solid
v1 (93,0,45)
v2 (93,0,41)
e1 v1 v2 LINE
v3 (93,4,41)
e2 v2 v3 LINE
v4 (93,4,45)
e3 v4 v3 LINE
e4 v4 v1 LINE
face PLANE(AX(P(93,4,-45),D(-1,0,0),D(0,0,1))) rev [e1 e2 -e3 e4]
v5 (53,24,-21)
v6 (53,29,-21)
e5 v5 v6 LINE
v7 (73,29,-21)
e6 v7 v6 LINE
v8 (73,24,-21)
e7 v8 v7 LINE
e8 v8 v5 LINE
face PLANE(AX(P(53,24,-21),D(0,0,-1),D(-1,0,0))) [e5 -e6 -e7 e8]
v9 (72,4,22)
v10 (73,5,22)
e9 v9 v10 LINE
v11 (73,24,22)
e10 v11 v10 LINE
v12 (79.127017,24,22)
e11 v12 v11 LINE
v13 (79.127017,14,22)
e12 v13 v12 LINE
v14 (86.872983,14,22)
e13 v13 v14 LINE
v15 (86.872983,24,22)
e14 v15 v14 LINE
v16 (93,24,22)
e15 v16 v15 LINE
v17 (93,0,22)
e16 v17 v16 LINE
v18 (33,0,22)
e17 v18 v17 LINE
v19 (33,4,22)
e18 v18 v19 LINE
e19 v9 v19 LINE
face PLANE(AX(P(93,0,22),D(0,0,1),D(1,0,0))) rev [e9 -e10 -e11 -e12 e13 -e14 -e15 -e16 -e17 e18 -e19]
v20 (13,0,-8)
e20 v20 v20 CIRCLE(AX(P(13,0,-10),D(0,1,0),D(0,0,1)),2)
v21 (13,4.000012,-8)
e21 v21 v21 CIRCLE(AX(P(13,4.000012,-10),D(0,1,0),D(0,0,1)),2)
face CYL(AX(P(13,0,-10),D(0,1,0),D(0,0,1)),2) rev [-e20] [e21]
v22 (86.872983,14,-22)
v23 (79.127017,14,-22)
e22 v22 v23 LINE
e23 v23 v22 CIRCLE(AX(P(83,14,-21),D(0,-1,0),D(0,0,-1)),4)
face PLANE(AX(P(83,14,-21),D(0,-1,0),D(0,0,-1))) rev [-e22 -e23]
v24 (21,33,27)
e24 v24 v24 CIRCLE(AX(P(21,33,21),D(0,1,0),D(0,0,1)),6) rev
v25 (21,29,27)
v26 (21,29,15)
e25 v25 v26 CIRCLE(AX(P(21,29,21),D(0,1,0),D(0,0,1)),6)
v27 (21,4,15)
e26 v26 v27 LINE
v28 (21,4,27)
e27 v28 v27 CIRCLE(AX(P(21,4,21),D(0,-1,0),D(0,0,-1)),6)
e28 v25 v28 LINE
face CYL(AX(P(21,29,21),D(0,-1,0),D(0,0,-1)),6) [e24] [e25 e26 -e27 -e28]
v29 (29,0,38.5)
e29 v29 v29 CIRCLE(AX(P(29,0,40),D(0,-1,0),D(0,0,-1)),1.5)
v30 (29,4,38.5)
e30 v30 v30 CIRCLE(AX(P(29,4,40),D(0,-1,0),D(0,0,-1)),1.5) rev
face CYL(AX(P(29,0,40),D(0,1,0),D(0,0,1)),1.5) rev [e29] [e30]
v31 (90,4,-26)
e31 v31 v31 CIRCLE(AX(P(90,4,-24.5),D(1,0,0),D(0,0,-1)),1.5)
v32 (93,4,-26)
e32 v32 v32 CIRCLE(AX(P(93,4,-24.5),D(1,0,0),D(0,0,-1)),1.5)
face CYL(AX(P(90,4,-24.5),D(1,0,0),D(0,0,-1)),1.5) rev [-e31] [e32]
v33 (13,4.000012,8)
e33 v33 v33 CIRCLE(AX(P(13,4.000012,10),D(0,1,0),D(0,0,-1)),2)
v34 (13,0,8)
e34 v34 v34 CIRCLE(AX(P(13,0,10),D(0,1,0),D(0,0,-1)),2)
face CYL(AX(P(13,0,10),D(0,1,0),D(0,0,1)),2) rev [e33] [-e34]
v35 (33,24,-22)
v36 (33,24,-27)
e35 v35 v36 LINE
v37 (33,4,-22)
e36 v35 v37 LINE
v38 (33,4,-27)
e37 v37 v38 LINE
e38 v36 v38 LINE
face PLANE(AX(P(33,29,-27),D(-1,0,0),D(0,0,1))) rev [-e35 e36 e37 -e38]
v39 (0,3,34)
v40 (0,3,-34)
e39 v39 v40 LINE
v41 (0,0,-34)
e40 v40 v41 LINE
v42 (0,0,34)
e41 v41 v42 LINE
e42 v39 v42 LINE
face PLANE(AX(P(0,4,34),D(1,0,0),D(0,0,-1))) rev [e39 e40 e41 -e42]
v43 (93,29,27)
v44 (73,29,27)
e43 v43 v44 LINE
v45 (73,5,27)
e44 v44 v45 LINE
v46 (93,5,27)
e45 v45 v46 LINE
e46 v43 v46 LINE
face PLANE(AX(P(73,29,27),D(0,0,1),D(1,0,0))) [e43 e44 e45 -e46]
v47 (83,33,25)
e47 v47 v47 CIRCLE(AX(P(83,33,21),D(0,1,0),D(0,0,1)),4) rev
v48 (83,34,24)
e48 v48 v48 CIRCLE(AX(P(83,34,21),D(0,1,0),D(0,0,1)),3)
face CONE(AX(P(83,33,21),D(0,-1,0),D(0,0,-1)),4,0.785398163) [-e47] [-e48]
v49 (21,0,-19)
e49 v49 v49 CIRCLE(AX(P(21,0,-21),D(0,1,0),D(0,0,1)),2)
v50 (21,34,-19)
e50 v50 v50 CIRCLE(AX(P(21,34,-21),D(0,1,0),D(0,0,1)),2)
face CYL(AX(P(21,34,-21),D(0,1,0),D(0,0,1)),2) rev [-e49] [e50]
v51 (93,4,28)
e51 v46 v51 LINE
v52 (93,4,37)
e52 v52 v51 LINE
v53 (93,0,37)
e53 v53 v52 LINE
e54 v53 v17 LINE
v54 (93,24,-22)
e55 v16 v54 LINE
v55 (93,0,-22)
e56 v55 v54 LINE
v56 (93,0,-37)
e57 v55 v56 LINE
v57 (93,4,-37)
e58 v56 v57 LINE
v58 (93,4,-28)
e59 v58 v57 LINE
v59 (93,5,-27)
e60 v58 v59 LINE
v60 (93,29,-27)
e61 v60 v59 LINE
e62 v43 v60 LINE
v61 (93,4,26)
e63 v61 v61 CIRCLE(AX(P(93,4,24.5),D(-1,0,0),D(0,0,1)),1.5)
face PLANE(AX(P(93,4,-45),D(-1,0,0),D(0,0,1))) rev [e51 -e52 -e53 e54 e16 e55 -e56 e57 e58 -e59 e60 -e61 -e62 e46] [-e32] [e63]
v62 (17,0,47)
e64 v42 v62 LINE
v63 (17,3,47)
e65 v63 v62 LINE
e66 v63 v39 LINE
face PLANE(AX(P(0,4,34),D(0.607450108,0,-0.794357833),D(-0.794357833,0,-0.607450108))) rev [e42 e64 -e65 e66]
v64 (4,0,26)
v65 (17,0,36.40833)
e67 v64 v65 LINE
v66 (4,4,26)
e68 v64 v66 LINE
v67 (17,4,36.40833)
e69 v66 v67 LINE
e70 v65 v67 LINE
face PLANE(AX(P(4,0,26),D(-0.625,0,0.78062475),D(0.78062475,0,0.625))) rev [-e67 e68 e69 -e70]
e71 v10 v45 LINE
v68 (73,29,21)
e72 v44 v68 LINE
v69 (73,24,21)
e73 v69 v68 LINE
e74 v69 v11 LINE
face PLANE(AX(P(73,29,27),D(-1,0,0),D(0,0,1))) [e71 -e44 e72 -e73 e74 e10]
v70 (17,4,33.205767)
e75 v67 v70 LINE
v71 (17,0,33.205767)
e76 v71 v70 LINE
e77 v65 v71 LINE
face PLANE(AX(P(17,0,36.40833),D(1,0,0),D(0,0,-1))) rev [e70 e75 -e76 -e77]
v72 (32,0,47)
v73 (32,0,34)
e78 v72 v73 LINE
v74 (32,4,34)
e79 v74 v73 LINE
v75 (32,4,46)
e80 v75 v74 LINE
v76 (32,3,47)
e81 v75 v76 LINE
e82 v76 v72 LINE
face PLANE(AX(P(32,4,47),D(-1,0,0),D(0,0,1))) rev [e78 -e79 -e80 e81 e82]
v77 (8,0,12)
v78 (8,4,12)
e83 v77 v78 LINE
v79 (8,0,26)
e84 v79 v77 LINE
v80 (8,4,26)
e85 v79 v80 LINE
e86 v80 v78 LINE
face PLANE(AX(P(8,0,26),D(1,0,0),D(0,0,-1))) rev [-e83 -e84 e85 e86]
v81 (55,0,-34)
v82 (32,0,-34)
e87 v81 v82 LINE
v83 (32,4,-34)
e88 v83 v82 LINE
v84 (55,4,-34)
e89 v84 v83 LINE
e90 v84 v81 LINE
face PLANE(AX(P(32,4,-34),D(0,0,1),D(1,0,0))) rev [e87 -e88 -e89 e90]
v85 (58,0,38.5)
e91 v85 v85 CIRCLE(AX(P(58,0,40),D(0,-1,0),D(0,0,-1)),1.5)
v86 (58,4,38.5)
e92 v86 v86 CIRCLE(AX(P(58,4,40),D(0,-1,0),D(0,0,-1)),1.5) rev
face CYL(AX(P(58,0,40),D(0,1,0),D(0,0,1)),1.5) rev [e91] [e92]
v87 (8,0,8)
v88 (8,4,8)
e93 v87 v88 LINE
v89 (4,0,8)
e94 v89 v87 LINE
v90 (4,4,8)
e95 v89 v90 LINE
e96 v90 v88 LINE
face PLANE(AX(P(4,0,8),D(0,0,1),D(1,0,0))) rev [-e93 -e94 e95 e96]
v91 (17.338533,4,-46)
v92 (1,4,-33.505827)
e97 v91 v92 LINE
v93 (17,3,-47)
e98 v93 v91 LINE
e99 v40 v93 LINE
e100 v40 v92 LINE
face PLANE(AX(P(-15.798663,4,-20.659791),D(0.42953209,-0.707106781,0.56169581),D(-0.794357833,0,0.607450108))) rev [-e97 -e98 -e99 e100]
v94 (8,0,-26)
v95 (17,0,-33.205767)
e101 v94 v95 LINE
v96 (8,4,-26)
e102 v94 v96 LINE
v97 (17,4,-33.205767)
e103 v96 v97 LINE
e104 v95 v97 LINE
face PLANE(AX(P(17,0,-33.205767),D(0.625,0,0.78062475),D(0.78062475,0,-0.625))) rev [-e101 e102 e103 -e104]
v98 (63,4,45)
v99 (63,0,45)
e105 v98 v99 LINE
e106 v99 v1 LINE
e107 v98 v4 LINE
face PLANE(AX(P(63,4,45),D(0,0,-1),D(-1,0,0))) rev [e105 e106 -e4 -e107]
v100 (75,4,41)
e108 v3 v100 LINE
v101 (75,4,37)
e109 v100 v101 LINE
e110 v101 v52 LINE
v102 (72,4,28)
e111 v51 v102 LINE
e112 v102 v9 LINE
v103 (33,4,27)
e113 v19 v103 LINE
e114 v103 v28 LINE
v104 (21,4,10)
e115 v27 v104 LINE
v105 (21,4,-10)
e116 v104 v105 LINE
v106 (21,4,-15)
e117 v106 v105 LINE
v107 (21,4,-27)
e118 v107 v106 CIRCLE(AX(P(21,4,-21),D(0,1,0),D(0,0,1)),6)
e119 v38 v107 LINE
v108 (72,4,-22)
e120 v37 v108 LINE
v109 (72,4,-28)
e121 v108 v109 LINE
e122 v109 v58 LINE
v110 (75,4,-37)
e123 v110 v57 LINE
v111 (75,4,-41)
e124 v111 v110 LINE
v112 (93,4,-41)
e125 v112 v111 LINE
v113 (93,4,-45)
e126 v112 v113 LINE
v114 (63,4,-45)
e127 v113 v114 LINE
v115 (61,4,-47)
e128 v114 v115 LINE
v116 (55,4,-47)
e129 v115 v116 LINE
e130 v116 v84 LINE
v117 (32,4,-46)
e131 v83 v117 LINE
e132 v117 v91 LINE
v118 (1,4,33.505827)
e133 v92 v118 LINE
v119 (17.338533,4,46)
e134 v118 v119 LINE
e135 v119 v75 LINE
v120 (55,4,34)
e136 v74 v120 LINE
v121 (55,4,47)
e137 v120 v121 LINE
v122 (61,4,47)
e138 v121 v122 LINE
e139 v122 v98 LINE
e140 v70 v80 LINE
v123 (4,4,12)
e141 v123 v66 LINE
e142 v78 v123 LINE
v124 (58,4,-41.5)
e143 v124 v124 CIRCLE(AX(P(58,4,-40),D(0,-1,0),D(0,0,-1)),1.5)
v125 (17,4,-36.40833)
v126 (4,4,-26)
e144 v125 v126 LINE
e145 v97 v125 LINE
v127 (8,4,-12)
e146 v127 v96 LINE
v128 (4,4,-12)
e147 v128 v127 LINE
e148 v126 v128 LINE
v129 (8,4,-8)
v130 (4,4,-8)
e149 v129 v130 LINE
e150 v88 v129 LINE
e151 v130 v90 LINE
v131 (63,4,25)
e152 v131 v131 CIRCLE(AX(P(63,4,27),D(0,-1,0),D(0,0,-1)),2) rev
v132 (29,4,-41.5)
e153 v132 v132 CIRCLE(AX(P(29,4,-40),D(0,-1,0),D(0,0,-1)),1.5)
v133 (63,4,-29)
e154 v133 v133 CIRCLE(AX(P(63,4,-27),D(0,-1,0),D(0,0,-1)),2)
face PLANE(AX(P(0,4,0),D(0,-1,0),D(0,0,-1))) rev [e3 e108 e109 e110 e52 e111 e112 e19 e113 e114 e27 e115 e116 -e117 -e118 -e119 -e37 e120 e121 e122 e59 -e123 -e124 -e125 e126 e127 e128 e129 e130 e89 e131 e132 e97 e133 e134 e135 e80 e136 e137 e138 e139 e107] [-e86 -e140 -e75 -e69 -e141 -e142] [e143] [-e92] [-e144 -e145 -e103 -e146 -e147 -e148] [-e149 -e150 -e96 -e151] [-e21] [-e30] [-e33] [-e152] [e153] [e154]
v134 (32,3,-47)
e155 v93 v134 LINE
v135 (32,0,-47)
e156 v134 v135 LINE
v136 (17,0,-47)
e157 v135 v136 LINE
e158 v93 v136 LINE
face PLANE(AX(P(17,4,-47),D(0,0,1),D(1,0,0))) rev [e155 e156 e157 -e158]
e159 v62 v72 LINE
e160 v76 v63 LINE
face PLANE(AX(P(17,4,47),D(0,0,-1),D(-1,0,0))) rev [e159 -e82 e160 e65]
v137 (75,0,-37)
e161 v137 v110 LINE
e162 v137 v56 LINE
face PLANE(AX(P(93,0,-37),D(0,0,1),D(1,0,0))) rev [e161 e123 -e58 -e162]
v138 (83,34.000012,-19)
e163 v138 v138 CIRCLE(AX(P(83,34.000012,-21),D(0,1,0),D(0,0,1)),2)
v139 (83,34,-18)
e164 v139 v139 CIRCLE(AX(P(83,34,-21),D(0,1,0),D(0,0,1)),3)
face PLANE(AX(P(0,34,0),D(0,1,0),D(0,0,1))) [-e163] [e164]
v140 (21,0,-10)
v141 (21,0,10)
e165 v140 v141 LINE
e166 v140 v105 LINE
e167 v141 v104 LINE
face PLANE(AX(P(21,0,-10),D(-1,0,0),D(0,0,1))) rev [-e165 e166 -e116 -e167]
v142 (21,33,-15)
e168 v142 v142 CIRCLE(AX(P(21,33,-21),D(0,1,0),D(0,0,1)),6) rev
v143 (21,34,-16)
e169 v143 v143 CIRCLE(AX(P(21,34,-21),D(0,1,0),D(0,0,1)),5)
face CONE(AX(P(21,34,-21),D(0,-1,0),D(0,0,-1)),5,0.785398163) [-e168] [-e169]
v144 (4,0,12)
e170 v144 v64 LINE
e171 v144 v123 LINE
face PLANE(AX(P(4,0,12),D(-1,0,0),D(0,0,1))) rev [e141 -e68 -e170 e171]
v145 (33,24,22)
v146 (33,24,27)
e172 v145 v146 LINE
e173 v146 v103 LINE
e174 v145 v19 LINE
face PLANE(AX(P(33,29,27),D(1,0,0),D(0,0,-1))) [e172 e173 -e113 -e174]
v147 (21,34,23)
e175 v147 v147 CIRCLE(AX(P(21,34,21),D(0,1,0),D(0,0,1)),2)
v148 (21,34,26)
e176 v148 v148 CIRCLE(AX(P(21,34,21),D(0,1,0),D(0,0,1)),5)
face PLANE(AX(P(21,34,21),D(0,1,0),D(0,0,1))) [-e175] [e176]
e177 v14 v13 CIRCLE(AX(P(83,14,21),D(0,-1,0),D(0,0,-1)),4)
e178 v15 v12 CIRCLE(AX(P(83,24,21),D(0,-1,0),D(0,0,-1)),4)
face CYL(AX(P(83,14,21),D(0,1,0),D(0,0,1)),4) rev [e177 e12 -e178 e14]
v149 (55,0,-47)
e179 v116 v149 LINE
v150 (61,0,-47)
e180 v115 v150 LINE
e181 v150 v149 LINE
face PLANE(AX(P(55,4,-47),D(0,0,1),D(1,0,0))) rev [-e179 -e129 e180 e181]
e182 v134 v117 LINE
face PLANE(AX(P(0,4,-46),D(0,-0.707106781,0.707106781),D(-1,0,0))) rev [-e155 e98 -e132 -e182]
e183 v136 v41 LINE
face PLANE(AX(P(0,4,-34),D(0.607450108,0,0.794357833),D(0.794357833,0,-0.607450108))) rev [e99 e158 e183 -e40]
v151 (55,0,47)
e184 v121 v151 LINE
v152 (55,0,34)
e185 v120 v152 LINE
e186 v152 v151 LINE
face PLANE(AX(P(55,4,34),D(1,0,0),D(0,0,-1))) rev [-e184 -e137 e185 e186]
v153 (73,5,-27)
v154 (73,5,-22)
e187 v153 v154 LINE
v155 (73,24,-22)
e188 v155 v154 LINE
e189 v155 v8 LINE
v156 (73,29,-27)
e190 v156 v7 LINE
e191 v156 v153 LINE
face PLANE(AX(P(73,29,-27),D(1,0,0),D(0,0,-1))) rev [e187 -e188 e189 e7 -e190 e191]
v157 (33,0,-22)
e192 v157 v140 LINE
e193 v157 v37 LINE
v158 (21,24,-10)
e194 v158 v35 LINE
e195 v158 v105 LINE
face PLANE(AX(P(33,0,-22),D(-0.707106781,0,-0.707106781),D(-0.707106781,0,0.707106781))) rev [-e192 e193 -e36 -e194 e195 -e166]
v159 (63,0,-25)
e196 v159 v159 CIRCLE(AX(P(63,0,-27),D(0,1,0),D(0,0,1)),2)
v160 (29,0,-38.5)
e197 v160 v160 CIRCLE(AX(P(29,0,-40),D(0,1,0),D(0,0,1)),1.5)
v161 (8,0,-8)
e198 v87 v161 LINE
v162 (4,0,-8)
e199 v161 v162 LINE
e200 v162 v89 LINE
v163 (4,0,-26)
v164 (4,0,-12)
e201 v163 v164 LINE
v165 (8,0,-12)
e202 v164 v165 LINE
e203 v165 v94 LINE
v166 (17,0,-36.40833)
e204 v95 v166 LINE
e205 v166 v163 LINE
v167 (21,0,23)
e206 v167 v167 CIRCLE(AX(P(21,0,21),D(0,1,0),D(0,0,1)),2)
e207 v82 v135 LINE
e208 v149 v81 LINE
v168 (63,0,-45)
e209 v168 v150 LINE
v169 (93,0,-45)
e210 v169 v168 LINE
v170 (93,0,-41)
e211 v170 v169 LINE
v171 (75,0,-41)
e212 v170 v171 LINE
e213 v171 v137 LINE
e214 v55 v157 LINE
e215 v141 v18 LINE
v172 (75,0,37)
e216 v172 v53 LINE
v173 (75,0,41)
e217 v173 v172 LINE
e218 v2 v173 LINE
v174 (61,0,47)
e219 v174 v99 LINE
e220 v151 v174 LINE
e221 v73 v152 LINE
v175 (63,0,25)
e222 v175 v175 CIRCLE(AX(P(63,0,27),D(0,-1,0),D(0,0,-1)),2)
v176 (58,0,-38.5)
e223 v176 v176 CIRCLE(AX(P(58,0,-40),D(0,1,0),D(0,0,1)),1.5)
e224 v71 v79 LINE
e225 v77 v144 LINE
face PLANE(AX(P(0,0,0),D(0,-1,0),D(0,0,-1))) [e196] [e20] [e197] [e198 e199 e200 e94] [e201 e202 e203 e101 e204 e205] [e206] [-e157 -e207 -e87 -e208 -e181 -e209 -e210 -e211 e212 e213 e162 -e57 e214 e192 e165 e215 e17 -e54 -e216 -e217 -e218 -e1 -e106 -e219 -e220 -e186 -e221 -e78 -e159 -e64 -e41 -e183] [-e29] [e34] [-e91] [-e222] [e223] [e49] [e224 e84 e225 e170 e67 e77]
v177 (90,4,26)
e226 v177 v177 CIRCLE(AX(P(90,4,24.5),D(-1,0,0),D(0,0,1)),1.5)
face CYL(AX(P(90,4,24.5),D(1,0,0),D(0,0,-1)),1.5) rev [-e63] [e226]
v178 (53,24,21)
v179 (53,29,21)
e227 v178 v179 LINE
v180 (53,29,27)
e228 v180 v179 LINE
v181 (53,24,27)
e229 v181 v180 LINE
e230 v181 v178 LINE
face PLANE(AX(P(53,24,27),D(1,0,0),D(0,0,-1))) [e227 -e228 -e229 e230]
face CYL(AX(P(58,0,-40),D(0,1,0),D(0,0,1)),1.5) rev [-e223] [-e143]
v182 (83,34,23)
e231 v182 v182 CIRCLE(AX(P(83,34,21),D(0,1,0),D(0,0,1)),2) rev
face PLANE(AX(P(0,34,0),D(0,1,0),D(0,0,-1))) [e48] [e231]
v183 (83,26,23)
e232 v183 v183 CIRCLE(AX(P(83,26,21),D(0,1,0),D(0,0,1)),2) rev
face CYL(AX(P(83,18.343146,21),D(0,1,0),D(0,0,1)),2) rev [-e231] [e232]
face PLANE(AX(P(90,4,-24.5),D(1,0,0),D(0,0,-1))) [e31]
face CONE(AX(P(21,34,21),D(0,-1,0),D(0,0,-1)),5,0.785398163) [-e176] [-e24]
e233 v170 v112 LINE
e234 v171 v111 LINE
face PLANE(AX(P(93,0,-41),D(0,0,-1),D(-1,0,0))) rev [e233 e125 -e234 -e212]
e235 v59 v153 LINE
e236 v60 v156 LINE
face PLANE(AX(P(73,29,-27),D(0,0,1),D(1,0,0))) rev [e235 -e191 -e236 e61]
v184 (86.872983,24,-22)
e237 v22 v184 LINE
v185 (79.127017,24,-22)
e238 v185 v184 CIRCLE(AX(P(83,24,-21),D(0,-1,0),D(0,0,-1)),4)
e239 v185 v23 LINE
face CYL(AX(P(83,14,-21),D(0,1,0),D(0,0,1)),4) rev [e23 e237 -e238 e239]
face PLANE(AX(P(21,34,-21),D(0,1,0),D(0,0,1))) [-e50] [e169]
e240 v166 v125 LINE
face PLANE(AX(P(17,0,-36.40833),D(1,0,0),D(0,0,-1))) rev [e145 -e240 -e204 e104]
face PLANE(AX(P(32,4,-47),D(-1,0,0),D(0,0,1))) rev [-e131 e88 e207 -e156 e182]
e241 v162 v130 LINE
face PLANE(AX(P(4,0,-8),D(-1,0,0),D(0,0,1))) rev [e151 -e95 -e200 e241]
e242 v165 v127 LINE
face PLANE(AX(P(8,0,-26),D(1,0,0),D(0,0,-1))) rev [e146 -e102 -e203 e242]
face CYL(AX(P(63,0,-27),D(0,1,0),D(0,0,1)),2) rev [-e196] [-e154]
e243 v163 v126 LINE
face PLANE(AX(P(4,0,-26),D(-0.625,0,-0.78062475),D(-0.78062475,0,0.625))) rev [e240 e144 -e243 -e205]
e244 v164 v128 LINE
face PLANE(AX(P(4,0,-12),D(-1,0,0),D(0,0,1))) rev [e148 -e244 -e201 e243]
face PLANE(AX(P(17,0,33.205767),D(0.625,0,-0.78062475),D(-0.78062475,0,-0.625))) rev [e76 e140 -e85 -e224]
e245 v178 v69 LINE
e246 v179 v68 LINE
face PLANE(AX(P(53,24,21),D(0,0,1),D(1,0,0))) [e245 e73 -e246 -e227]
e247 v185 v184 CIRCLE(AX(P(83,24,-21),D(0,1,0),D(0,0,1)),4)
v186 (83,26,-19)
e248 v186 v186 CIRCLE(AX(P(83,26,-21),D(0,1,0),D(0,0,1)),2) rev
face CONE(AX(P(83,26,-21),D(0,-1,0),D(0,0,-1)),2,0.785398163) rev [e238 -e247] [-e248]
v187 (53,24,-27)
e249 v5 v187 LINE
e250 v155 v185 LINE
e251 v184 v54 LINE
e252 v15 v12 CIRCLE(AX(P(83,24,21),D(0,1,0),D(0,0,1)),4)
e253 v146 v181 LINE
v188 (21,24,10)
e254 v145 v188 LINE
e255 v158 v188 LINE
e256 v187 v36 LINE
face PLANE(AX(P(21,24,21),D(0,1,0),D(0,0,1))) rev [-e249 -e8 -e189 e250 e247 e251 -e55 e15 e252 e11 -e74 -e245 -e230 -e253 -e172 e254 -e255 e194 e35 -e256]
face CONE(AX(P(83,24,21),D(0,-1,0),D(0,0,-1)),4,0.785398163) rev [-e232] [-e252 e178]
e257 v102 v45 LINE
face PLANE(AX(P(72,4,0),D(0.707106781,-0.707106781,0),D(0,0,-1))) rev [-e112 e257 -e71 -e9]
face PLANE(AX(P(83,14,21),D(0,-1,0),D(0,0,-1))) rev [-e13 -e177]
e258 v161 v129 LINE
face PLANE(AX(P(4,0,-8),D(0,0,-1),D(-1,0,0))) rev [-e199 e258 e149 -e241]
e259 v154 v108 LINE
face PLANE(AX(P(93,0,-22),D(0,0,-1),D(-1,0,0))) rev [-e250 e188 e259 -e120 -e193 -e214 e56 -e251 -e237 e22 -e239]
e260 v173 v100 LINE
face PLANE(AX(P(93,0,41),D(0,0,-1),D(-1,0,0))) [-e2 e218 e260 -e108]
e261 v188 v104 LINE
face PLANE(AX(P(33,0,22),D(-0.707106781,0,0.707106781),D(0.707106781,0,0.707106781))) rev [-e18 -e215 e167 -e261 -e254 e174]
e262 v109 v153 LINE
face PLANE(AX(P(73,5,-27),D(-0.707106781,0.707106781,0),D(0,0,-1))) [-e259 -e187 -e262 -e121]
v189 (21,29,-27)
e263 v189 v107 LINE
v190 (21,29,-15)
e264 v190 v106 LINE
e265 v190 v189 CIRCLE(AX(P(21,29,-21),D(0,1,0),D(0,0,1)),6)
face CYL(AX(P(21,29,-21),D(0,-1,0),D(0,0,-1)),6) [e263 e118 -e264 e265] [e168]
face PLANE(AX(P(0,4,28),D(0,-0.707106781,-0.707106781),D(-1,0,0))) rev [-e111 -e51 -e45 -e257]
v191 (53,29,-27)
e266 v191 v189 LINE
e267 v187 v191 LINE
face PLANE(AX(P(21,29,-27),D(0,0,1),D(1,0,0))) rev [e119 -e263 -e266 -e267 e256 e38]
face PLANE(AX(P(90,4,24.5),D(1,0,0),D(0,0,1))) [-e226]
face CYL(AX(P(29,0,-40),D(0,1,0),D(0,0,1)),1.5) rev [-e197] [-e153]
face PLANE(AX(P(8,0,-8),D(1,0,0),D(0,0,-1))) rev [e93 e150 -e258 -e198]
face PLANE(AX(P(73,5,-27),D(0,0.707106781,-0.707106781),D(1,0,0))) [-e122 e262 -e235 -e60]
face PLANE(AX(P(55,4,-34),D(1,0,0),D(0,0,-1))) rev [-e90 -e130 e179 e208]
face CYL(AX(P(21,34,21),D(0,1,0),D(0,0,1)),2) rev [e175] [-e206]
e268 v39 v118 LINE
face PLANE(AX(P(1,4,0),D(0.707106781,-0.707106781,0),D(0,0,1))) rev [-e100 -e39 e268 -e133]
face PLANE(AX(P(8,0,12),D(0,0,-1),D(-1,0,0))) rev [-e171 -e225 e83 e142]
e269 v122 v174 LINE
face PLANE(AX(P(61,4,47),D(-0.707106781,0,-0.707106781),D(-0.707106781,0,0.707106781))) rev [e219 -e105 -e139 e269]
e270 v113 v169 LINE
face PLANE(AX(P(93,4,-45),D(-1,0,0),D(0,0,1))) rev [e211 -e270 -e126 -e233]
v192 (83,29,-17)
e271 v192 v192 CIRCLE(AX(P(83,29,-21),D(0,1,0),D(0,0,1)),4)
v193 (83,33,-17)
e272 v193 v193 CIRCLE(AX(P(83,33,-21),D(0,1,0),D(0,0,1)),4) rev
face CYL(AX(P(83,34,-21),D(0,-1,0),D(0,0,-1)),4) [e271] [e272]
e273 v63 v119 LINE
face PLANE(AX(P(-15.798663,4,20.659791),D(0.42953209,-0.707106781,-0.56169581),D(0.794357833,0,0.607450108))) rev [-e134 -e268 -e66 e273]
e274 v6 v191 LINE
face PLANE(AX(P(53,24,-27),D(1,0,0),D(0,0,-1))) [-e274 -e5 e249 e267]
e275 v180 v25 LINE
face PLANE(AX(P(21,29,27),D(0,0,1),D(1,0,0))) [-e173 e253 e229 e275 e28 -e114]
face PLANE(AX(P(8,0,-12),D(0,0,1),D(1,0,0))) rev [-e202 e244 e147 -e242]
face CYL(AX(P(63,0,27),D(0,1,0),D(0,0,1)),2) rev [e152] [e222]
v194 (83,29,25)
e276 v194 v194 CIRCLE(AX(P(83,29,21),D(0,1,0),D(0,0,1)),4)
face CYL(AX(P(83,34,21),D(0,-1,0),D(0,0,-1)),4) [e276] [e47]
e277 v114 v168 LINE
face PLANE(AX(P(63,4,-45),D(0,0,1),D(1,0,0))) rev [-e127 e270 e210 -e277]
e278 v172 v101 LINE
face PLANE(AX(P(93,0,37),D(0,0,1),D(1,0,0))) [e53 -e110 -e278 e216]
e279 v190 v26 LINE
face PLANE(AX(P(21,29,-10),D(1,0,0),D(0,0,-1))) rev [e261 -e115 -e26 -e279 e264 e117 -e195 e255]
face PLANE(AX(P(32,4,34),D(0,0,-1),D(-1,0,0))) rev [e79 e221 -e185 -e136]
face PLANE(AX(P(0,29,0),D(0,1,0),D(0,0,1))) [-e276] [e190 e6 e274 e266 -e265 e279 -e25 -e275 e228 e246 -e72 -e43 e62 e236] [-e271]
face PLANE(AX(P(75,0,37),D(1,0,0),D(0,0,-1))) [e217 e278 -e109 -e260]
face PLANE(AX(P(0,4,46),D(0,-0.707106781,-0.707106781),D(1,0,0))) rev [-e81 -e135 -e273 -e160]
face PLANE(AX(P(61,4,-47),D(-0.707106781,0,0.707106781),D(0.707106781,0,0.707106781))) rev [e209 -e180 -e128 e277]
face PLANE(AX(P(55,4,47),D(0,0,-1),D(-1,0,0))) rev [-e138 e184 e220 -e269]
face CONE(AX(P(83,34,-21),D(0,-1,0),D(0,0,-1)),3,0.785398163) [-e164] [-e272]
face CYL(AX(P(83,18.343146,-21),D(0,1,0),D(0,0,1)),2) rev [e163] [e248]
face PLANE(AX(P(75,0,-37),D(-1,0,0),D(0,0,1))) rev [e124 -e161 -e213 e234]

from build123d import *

# Parameters (mm, degrees)
EXTRUDE_1_DEPTH                = 4
CUT_EXTRUDE_1_DEPTH            = 105.27847333
CUT_EXTRUDE_1_DEPTH_BACK       = 105.27847333
SKETCH_2_R                     = 2
SKETCH_2_W                     = 4
SKETCH_2_H                     = 16
CHAMFER_1_SIZE                 = 1
CUT_EXTRUDE_2_DEPTH            = 105.27847333
CUT_EXTRUDE_2_DEPTH_BACK       = 105.27847333
SKETCH_6_W                     = 20
SKETCH_6_H                     = 5
EXTRUDE_2_DEPTH                = 25
CHAMFER_2_SIZE                 = 1
EXTRUDE_START                  = -5
EXTRUDE_3_DEPTH                = 5
SKETCH_8_R                     = 6
EXTRUDE_4_DEPTH                = 5
CHAMFER_3_SIZE                 = 1
SKETCH_9_R                     = 4
EXTRUDE_5_DEPTH                = 5
CUT_EXTRUDE_START              = -10
SKETCH_10_R                    = 2
CUT_EXTRUDE_3_DEPTH            = 120.608393839
HOLE_WIZARD_1_4_0_15748031_1_D = 3.999999874
SKETCH_13_R                    = 1.5
CUT_EXTRUDE_4_DEPTH            = 109.434311913
SKETCH_14_R                    = 2
CUT_EXTRUDE_5_DEPTH            = 109.434311913
CUT_EXTRUDE_START_2            = 10
SKETCH_15_R                    = 4
CUT_EXTRUDE_6_DEPTH            = 10
CHAMFER_4_SIZE                 = 2
CHAMFER_5_SIZE                 = 1
SKETCH_16_W                    = 18
SKETCH_16_H                    = 4
CUT_EXTRUDE_7_DEPTH            = 109.434311913
SKETCH_17_R                    = 1.5
CUT_EXTRUDE_8_DEPTH            = 3


with BuildPart() as part:
    # 草图1 → 凸台-拉伸1 (new body)
    with BuildSketch(Plane(origin=(0, 0, 0), x_dir=(1, 0, 0), z_dir=(0, 1, 0))):
        Polygon((0, -34), (0, 34), (17, 47), (32, 47), (32, 34), (55, 34), (55, 47), (61, 47), (63, 45), (93, 45), (93, -45), (63, -45), (61, -47), (55, -47), (55, -34), (32, -34), (32, -47), (17, -47), align=None)
    extrude(amount=EXTRUDE_1_DEPTH)

    # 草图2 → 切除-拉伸1 (cut, two sides: drawn at the far end of the back side and taken through both)
    with BuildSketch(Plane(origin=(0, 4, 0), x_dir=(1, 0, 0), z_dir=(0, 1, 0)).offset(-CUT_EXTRUDE_1_DEPTH_BACK)):
        with Locations(Location((13, 10, 0), (0, 0, 270))):
            Circle(SKETCH_2_R)
        with Locations(Location((13, -10, 0), (0, 0, 90))):
            Circle(SKETCH_2_R)
        with Locations((6, 0)):
            Rectangle(SKETCH_2_W, SKETCH_2_H)
        Polygon((4, 12), (4, 26), (17, 36.408329997), (17, 33.205766921), (8, 26), (8, 12), align=None)
        Polygon((8, -26), (8, -12), (4, -12), (4, -26), (17, -36.408329997), (17, -33.205766921), align=None)
    extrude(amount=CUT_EXTRUDE_1_DEPTH + CUT_EXTRUDE_1_DEPTH_BACK, mode=Mode.SUBTRACT)

    # 倒角1
    chamfer_1_edges = [part.edges().sort_by_distance(p)[0] for p in [
        (8.5, 4, 40.5),
        (24.5, 4, 47),
        (8.5, 4, -40.5),
        (24.5, 4, -47),
        (0, 4, 0),
    ]]
    chamfer(chamfer_1_edges, length=CHAMFER_1_SIZE)

    # 草图3 → 切除-拉伸2 (cut, two sides: drawn at the far end of the back side and taken through both)
    with BuildSketch(Plane(origin=(0, 4, 0), x_dir=(1, 0, 0), z_dir=(0, 1, 0)).offset(-CUT_EXTRUDE_2_DEPTH_BACK)):
        Polygon((93, 22), (33, 22), (21, 10), (21, -10), (33, -22), (93, -22), align=None)
    extrude(amount=CUT_EXTRUDE_2_DEPTH + CUT_EXTRUDE_2_DEPTH_BACK, mode=Mode.SUBTRACT)

    # 草图6 → 凸台-拉伸2 (add)
    with BuildSketch(Plane(origin=(0, 4, 0), x_dir=(1, 0, 0), z_dir=(0, 1, 0))):
        with BuildLine():
            Line((21, 10), (21, 15))
            ThreePointArc((21, 15), (15, 21), (21, 27))
            Line((21, 27), (33, 27))
            Line((33, 27), (33, 22))
            Line((33, 22), (21, 10))
        make_face()
        with Locations((83, 24.5)):
            Rectangle(SKETCH_6_W, SKETCH_6_H)
    extrude_2 = extrude(amount=EXTRUDE_2_DEPTH)

    # 镜向1: 凸台-拉伸2 across plane
    add(extrude_2.mirror(Plane.XY))

    # 倒角2
    chamfer_2_edges = [part.edges().sort_by_distance(p)[0] for p in [
        (83, 4, -27),
        (73, 4, -24.5),
        (83, 4, 27),
        (73, 4, 24.5),
    ]]
    chamfer(chamfer_2_edges, length=CHAMFER_2_SIZE)

    # 草图7 → 凸台-拉伸3 (add)
    with BuildSketch(Plane(origin=(0, 29, 0), x_dir=(1, 0, 0), z_dir=(0, 1, 0)).offset(EXTRUDE_START)):
        with BuildLine():
            Line((93, 22), (93, 27))
            Line((93, 27), (73, 27))
            Line((73, 27), (73, 21))
            Line((73, 21), (53, 21))
            Line((53, 21), (53, 27))
            Line((53, 27), (33, 27))
            Line((33, 27), (21, 27))
            ThreePointArc((21, 27), (15, 21), (21, 15))
            Line((21, 15), (21, 10))
            Line((21, 10), (21, -10))
            Line((21, -10), (21, -15))
            ThreePointArc((21, -15), (15, -21), (21, -27))
            Line((21, -27), (33, -27))
            Line((33, -27), (53, -27))
            Line((53, -27), (53, -21))
            Line((53, -21), (73, -21))
            Line((73, -21), (73, -27))
            Line((73, -27), (93, -27))
            Line((93, -27), (93, -22))
            Line((93, -22), (93, 22))
        make_face()
    extrude(amount=EXTRUDE_3_DEPTH)

    # 草图8 → 凸台-拉伸4 (add)
    with BuildSketch(Plane(origin=(0, 29, 0), x_dir=(1, 0, 0), z_dir=(0, 1, 0))):
        with Locations(Location((21, 21, 0), (0, 0, 270))):
            Circle(SKETCH_8_R)
        with Locations(Location((21, -21, 0), (0, 0, 270))):
            Circle(SKETCH_8_R)
    extrude(amount=EXTRUDE_4_DEPTH)

    # 倒角3
    chamfer_3_edges = [part.edges().sort_by_distance(p)[0] for p in [
        (21, 34, -27),
        (21, 34, 15),
    ]]
    chamfer(chamfer_3_edges, length=CHAMFER_3_SIZE)

    # 草图9 → 凸台-拉伸5 (add)
    with BuildSketch(Plane(origin=(0, 29, 0), x_dir=(1, 0, 0), z_dir=(0, 1, 0))):
        with Locations(Location((83, 21, 0), (0, 0, 270))):
            Circle(SKETCH_9_R)
    extrude_5 = extrude(amount=EXTRUDE_5_DEPTH)

    # 草图10 → 切除-拉伸3 (cut)
    with BuildSketch(Plane(origin=(0, 34, 0), x_dir=(1, 0, 0), z_dir=(0, 1, 0)).offset(CUT_EXTRUDE_START)):
        with Locations(Location((83, 21, 0), (0, 0, 270))):
            Circle(SKETCH_10_R)
    cut_extrude_3 = extrude(amount=CUT_EXTRUDE_3_DEPTH, mode=Mode.SUBTRACT)

    # 镜向2: 凸台-拉伸5, 切除-拉伸3 across plane
    add(extrude_5.mirror(Plane.XY))
    add(cut_extrude_3.mirror(Plane.XY), mode=Mode.SUBTRACT)

    # 1/4 (0.15748031) 直径孔1 (through all)
    with Locations(Plane(origin=(21, 34, -21), x_dir=(0, 0, 1), z_dir=(0, 1, 0))):
        with Locations((0, 0)):
            hole_wizard_1_4_0_15748031_1 = Hole(HOLE_WIZARD_1_4_0_15748031_1_D / 2)

    # 镜向3: 1/4 (0.15748031) 直径孔1 across plane
    add(hole_wizard_1_4_0_15748031_1.mirror(Plane.XY), mode=Mode.SUBTRACT)

    # 草图13 → 切除-拉伸4 (cut, symmetric)
    with BuildSketch(Plane(origin=(0, 4, 0), x_dir=(1, 0, 0), z_dir=(0, 1, 0))):
        with Locations(Location((29, 40, 0), (0, 0, 270))):
            Circle(SKETCH_13_R)
        with Locations(Location((58, 40, 0), (0, 0, 270))):
            Circle(SKETCH_13_R)
    cut_extrude_4 = extrude(amount=CUT_EXTRUDE_4_DEPTH, both=True, mode=Mode.SUBTRACT)

    # 镜向4: 切除-拉伸4 across plane
    add(cut_extrude_4.mirror(Plane.XY), mode=Mode.SUBTRACT)

    # 草图14 → 切除-拉伸5 (cut, symmetric)
    with BuildSketch(Plane(origin=(0, 4, 0), x_dir=(1, 0, 0), z_dir=(0, 1, 0))):
        with Locations(Location((63, 27, 0), (0, 0, 270))):
            Circle(SKETCH_14_R)
    cut_extrude_5 = extrude(amount=CUT_EXTRUDE_5_DEPTH, both=True, mode=Mode.SUBTRACT)

    # 镜向5: 切除-拉伸5 across plane
    add(cut_extrude_5.mirror(Plane.XY), mode=Mode.SUBTRACT)

    # 草图15 → 切除-拉伸6 (cut)
    with BuildSketch(Plane.XZ.offset(-24).offset(CUT_EXTRUDE_START_2)):
        with Locations(Location((83, 21, 0), (0, 0, 270))):
            Circle(SKETCH_15_R)
        with Locations(Location((83, -21, 0), (0, 0, 90))):
            Circle(SKETCH_15_R)
    extrude(amount=-CUT_EXTRUDE_6_DEPTH, mode=Mode.SUBTRACT)

    # 倒角4
    chamfer_4_edges = [part.edges().sort_by_distance(p)[0] for p in [
        (83, 24, -23),
        (83, 24, 23),
    ]]
    chamfer(chamfer_4_edges, length=CHAMFER_4_SIZE - 0.0001)  # a hair under: the kernel refuses the full size

    # 倒角5
    chamfer_5_edges = [part.edges().sort_by_distance(p)[0] for p in [
        (83, 34, -25),
        (83, 34, 25),
    ]]
    chamfer(chamfer_5_edges, length=CHAMFER_5_SIZE)

    # 草图16 → 切除-拉伸7 (cut, through all)
    with BuildSketch(Plane(origin=(0, 4, 0), x_dir=(1, 0, 0), z_dir=(0, 1, 0))):
        with Locations((84, 39)):
            Rectangle(SKETCH_16_W, SKETCH_16_H)
    cut_extrude_7 = extrude(amount=-CUT_EXTRUDE_7_DEPTH, mode=Mode.SUBTRACT)

    # 镜向6: 切除-拉伸7 across plane
    add(cut_extrude_7.mirror(Plane.XY), mode=Mode.SUBTRACT)

    # 草图17 → 切除-拉伸8 (cut)
    with BuildSketch(Plane(origin=(93, 0, 0), x_dir=(0, 0, -1), z_dir=(1, 0, 0))):
        with Locations((24.5, 4)):
            Circle(SKETCH_17_R)
    cut_extrude_8 = extrude(amount=-CUT_EXTRUDE_8_DEPTH, mode=Mode.SUBTRACT)

    # 镜向7: 切除-拉伸8 across plane
    add(cut_extrude_8.mirror(Plane.XY), mode=Mode.SUBTRACT)


solid = part.part
